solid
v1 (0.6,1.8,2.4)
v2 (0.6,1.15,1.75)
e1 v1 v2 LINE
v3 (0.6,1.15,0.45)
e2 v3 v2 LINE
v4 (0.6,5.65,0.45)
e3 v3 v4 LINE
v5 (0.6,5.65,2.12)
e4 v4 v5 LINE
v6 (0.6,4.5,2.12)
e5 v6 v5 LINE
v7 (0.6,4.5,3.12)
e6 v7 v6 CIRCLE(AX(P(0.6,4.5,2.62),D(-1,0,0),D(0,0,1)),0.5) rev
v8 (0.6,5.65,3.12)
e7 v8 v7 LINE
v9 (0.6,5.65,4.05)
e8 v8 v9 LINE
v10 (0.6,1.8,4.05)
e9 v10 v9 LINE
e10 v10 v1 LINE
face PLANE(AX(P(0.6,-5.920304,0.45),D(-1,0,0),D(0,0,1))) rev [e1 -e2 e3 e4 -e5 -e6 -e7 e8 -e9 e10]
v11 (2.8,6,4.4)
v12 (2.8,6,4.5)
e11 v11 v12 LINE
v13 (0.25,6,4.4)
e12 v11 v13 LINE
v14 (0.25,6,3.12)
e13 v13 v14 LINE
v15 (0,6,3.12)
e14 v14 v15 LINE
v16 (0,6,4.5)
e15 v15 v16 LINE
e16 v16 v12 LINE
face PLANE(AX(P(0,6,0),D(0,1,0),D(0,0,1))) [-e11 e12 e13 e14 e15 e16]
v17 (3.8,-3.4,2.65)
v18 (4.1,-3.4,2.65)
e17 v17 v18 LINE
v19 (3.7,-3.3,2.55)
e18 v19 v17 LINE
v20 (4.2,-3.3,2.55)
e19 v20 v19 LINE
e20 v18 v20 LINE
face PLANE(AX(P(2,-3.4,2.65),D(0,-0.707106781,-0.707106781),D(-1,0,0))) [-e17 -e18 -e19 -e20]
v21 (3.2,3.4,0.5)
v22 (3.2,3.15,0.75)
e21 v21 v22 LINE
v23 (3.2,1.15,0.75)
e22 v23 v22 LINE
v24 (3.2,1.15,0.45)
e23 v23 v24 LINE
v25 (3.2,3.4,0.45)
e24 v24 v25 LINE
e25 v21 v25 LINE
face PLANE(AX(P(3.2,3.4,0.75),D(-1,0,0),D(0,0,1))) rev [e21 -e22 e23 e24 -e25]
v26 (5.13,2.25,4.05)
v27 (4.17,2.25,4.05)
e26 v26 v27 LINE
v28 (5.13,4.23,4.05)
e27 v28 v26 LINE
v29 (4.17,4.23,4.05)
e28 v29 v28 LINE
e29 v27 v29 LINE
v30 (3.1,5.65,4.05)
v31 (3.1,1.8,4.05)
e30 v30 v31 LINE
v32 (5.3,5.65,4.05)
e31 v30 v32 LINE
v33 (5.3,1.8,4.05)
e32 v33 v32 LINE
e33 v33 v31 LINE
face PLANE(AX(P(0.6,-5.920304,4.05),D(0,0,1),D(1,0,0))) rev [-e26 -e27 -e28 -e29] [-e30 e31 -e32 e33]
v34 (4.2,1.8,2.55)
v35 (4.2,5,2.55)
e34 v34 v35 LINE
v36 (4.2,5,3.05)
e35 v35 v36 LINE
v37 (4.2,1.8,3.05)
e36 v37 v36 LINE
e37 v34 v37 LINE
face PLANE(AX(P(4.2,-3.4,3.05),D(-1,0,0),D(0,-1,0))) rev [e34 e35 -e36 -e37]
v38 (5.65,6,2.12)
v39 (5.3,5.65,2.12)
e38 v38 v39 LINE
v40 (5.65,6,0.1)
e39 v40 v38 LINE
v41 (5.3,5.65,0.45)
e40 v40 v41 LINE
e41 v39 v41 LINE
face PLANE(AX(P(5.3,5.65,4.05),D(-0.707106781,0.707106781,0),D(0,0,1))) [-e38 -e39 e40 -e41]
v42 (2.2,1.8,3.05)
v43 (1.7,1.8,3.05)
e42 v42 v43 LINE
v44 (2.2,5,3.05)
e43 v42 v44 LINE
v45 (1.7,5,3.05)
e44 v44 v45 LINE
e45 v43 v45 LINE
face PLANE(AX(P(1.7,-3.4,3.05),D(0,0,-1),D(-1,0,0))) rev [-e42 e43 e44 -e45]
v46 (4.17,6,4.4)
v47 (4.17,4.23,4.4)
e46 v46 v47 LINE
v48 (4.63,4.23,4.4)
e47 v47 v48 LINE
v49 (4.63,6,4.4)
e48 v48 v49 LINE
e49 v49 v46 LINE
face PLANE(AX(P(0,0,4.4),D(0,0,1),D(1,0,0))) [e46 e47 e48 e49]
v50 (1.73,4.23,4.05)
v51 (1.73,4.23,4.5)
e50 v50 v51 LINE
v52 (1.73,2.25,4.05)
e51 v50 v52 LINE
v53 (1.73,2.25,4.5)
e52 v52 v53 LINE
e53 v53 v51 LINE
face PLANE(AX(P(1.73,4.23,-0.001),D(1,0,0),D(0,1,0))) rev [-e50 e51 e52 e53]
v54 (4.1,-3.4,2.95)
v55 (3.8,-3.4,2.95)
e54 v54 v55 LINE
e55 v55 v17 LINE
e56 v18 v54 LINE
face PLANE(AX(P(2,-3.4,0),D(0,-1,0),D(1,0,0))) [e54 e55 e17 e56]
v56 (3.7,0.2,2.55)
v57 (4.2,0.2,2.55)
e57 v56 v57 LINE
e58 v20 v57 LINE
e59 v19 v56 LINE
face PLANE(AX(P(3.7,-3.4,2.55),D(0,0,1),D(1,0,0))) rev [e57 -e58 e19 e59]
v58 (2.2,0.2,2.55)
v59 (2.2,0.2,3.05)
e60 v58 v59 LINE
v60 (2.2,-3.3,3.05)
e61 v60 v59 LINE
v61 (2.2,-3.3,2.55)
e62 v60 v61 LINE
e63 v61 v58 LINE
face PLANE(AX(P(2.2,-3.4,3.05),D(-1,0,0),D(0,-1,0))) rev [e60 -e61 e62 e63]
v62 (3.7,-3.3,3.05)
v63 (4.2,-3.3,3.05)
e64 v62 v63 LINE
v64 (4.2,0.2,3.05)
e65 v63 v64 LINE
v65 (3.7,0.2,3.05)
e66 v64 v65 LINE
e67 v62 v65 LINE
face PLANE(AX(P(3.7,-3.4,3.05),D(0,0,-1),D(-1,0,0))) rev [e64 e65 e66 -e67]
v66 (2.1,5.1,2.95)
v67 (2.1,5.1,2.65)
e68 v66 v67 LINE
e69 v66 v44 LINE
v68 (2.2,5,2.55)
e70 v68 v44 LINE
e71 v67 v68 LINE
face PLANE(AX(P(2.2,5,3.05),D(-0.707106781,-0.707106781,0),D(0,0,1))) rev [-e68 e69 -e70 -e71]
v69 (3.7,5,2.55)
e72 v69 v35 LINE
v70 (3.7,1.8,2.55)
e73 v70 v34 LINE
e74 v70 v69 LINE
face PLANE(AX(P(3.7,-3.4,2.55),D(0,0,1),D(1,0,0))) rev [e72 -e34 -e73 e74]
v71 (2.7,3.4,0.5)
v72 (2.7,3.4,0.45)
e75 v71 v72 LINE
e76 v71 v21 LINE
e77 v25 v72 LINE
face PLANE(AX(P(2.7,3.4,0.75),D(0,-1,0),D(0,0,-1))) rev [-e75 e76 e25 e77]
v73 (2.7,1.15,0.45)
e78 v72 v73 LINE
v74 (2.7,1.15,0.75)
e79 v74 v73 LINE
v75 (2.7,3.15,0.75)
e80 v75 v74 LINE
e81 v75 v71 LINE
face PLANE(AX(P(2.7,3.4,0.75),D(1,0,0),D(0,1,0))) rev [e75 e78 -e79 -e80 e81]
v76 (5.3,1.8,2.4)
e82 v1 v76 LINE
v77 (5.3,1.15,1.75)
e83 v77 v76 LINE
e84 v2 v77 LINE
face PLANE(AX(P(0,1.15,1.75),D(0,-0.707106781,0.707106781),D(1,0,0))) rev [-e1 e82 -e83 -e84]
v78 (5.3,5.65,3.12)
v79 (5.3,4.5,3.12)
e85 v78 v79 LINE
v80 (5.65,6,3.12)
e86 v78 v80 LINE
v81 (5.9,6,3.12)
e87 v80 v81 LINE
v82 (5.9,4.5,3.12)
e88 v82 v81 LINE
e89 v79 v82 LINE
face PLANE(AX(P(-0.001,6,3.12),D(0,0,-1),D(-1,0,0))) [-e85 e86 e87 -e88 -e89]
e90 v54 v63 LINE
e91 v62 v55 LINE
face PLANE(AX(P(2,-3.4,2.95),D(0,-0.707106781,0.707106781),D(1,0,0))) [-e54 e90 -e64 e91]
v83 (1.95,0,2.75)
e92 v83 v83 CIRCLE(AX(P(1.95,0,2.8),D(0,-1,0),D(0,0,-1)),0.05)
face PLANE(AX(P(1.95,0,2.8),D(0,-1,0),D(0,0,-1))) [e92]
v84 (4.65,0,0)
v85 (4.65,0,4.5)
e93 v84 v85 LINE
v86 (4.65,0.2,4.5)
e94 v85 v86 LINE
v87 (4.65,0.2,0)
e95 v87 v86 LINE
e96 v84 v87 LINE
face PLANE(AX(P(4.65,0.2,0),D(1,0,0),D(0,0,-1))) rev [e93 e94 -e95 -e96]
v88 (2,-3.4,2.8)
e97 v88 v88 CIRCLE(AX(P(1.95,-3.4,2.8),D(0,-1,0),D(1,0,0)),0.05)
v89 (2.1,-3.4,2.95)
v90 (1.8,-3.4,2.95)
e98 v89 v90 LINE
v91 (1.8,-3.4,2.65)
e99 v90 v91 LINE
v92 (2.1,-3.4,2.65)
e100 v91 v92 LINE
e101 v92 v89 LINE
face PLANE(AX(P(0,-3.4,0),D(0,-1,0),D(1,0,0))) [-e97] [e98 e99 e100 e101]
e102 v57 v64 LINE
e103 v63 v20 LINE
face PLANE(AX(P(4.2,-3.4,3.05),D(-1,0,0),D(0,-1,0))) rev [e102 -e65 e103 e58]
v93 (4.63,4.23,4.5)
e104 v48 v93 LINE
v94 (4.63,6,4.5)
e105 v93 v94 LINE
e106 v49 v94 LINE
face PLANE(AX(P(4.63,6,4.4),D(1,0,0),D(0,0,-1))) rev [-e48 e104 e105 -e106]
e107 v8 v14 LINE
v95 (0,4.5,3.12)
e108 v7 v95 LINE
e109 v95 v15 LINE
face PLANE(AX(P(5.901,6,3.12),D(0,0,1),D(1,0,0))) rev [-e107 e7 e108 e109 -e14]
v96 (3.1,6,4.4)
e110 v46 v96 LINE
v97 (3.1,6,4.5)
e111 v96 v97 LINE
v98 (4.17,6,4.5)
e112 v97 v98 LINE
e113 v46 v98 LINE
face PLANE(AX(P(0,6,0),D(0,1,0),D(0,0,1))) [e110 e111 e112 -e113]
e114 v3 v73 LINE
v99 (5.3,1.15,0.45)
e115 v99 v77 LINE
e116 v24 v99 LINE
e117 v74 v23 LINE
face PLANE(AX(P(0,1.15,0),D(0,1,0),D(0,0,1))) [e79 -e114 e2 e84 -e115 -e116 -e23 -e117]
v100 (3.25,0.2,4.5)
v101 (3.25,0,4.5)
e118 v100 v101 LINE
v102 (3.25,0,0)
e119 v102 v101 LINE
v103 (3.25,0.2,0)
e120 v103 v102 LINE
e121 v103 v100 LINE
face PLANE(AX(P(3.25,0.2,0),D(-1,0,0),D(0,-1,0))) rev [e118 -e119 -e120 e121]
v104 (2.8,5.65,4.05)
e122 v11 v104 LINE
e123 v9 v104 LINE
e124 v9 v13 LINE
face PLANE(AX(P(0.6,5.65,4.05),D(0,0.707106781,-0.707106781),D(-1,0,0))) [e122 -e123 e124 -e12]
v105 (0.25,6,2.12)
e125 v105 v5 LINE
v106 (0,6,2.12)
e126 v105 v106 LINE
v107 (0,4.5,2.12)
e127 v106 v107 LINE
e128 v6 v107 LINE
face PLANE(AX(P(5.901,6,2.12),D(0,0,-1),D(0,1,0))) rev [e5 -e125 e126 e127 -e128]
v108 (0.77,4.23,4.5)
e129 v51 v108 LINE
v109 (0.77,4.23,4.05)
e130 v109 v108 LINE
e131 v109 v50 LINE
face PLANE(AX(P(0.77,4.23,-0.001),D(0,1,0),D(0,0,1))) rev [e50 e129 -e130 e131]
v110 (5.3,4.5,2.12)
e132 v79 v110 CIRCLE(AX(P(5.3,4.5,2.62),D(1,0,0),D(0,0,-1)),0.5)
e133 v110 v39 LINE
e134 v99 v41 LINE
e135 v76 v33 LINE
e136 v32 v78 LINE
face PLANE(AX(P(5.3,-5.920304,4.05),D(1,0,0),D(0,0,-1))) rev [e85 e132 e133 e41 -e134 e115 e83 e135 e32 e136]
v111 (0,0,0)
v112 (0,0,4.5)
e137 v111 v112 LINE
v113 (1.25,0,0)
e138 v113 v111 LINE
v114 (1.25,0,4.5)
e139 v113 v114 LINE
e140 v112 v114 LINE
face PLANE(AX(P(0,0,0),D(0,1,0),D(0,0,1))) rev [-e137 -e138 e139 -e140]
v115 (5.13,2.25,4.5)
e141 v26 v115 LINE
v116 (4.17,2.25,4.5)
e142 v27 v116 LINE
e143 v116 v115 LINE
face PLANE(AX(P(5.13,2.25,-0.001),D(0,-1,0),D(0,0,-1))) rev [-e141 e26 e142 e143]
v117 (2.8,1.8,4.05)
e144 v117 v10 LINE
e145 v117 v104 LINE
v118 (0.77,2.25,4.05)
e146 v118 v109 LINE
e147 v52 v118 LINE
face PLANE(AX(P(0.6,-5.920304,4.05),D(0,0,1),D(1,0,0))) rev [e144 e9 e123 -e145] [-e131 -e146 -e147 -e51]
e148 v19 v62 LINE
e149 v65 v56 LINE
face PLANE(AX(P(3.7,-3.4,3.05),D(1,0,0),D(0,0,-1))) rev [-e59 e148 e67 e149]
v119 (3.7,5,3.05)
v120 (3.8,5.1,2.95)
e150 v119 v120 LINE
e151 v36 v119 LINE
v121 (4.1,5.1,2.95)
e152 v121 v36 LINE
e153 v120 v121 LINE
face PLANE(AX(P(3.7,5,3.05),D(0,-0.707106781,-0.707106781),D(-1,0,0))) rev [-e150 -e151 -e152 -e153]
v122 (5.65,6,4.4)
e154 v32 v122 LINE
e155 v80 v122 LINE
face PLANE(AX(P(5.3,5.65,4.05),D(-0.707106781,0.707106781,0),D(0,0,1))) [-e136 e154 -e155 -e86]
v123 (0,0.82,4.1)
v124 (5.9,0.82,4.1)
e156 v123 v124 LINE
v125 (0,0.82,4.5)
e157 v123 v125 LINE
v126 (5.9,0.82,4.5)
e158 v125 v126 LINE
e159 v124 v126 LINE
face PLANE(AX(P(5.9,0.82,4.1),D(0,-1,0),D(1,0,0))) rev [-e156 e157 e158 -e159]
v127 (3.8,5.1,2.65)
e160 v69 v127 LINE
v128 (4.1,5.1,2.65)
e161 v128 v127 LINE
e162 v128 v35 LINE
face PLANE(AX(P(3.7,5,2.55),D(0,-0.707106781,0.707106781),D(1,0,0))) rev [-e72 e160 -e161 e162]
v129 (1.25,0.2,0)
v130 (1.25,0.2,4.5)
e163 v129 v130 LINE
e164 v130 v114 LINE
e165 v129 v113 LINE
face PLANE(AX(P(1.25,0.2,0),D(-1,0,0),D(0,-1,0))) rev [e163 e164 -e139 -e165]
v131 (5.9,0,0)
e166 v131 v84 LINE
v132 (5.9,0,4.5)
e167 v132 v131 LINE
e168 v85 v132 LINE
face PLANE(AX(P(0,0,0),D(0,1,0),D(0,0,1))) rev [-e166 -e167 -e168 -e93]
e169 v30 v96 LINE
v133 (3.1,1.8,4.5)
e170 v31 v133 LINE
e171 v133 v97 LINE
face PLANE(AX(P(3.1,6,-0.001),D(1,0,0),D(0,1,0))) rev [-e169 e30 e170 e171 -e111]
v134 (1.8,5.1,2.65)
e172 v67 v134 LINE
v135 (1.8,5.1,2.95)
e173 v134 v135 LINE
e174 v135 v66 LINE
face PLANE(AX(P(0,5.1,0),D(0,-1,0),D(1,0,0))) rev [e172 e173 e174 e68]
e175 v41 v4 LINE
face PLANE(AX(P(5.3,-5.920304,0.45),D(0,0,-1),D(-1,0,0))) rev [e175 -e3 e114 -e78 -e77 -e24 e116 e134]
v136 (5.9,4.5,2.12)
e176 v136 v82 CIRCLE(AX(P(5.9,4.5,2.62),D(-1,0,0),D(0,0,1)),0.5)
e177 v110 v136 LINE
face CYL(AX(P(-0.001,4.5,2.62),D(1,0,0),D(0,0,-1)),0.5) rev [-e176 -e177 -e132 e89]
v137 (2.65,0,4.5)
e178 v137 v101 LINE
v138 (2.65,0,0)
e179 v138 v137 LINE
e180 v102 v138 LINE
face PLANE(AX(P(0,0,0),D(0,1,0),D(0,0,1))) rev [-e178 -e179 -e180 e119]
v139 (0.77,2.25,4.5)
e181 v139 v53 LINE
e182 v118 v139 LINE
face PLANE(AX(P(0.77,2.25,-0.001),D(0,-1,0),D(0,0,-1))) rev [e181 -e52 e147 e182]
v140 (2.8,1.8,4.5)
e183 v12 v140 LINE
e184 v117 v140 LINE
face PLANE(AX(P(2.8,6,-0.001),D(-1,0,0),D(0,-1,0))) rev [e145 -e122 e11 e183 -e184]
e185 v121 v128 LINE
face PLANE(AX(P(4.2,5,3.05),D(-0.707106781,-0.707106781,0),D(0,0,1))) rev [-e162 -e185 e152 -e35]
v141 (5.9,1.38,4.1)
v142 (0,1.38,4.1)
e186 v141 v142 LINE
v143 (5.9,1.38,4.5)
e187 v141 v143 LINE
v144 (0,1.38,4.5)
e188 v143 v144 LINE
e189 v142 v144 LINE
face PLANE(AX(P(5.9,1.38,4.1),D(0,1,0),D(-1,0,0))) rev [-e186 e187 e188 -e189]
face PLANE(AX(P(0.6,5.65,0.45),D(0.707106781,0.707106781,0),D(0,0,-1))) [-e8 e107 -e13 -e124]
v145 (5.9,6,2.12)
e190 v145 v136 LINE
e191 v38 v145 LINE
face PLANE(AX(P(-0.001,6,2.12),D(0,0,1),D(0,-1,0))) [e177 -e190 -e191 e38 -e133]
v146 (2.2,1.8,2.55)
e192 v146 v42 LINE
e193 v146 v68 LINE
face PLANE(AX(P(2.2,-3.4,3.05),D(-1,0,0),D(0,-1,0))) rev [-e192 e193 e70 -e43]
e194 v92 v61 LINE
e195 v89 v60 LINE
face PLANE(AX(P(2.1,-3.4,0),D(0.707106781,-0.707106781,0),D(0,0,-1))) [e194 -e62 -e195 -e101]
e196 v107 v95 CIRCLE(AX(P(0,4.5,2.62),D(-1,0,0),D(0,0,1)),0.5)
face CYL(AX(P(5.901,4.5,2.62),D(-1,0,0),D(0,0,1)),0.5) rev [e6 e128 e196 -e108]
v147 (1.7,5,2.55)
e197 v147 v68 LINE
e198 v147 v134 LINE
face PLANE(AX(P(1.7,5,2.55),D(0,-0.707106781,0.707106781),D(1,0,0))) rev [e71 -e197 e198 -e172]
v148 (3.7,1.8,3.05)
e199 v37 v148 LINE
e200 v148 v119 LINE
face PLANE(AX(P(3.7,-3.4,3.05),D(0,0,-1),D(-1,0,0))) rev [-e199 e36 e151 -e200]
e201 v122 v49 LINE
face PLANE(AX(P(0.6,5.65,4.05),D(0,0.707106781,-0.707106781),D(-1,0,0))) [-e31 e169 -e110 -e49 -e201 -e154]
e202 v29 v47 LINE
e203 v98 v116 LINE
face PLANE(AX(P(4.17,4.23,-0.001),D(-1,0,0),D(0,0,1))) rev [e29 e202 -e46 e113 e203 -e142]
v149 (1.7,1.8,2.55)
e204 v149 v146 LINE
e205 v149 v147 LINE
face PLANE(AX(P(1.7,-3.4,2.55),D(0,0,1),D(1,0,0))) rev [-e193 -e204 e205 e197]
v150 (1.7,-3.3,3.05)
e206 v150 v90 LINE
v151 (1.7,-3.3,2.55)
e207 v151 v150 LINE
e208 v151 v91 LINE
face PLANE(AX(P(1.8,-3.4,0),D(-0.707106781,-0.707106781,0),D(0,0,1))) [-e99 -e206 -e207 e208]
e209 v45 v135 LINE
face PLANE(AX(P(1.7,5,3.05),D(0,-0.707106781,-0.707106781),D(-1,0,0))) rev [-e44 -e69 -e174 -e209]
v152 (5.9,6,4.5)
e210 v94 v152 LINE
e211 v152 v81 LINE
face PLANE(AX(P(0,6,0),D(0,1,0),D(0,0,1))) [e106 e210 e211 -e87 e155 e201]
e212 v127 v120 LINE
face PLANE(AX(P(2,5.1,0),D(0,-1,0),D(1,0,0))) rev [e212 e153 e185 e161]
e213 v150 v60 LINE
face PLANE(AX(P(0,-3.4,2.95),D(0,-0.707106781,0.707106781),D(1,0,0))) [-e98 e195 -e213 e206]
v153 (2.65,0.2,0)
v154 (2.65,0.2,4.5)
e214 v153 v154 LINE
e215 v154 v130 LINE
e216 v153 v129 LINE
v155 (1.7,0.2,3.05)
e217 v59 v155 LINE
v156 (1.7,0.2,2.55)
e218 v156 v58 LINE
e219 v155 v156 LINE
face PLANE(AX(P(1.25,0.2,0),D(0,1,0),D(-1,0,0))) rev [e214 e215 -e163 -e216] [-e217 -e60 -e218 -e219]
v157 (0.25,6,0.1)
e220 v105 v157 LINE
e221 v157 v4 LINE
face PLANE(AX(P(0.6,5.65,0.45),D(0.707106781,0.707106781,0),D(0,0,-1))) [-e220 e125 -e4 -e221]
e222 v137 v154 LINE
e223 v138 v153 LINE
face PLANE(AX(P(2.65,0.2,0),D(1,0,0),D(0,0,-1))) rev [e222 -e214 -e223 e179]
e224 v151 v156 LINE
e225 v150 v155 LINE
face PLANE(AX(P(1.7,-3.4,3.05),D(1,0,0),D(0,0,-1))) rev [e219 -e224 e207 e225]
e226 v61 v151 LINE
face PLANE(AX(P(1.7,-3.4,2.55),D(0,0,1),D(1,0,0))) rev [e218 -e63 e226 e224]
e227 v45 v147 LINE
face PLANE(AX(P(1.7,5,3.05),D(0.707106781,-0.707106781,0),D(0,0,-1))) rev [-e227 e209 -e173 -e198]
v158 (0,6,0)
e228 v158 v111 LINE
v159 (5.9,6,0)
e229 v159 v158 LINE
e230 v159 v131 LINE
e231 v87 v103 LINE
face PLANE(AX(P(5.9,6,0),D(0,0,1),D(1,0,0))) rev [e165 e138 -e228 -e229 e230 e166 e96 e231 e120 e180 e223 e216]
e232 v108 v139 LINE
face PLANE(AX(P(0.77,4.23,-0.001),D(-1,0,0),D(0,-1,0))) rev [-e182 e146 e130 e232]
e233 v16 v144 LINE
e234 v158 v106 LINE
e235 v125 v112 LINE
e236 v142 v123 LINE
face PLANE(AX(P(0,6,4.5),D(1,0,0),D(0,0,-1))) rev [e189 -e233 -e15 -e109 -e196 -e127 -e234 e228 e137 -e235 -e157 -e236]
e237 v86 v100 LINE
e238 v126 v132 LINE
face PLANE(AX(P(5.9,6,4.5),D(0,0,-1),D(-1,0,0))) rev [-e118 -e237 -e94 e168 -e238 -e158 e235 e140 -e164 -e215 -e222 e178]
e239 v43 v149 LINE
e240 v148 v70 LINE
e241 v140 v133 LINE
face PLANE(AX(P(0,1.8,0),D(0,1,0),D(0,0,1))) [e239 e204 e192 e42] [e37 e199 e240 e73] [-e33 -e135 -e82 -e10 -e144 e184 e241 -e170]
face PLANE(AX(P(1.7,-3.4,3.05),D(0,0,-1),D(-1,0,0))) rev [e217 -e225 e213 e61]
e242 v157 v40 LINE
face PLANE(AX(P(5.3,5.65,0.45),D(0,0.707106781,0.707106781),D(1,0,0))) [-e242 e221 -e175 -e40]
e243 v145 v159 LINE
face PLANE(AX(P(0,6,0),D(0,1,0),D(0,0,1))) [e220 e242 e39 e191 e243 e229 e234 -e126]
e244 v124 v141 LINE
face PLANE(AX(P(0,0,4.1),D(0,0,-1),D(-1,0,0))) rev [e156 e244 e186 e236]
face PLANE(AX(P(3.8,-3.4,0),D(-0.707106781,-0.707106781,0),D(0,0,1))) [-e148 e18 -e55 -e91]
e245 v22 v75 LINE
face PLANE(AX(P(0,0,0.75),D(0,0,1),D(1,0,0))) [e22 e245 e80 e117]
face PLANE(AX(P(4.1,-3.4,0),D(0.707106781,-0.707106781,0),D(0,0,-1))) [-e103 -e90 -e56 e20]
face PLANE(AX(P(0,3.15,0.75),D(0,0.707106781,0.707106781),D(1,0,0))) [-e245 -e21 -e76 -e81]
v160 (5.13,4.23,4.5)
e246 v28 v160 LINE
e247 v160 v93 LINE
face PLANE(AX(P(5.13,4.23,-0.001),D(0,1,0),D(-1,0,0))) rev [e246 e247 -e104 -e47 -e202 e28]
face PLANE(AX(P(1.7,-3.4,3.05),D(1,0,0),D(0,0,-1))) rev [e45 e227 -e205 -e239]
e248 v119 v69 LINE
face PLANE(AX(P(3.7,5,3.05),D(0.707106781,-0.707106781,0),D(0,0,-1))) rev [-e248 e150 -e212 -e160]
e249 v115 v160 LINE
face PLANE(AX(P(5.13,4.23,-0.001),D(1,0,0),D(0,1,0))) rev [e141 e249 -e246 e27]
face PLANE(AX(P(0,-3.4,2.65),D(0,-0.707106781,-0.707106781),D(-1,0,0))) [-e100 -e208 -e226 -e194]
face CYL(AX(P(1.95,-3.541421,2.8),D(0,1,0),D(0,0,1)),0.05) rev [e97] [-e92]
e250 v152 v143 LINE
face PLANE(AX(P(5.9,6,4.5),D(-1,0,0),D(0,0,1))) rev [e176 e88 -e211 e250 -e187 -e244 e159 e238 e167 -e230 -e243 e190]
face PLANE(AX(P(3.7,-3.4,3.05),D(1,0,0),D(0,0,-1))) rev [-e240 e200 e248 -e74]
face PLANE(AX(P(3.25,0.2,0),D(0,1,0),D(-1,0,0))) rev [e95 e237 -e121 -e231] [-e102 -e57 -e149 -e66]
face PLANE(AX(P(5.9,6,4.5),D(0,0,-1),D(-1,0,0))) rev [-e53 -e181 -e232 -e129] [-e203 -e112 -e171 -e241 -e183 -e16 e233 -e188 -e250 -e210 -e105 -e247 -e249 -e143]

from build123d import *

# Parameters (mm, degrees)
BODY1_W                            = 5.9
BODY1_H                            = 4.5
EXTRUDE_1_DEPTH                    = 6
SKETCH_2_W                         = 4.7
SKETCH_2_H                         = 3.6
CUT_EXTRUDE_1_DEPTH                = 4.2
SKETCH_3_W                         = 5.9
SKETCH_3_H                         = 0.56
CUT_EXTRUDE_2_DEPTH                = 0.4
CHAMFER_1_SIZE                     = 0.35
CUT_EXTRUDE_3_REACH                = 11.543
SKETCH_4_W                         = 0.96
SKETCH_4_H                         = 1.98
SKETCH_5_W                         = 1.4
SKETCH_5_H                         = 0.2
CUT_EXTRUDE_4_DEPTH                = 10.54253635
SKETCH_7_W                         = 0.46
SKETCH_7_H                         = 1.77
CUT_EXTRUDE_5_DEPTH                = 0.1
CUT_EXTRUDE_6_REACH                = 11.543
SKETCH_8_W                         = 0.3
SKETCH_8_H                         = 4.2
CUT_EXTRUDE_7_REACH                = 11.543
SKETCH_15_W                        = 4.7
SKETCH_15_H                        = 1.95
CUT_EXTRUDE_9_DEPTH                = 0.65
CHAMFER_7_SIZE                     = 0.65
SKETCH_10_W                        = 0.5
SKETCH_10_H                        = 2.25
EXTRUDE_2_DEPTH                    = 0.3
CHAMFER_2_SIZE                     = 0.25
EXTRUDE_START                      = -4.9
SKETCH_12_W                        = 0.5
SKETCH_12_H                        = 0.5
EXTRUDE_4_DEPTH                    = 8.5
CHAMFER_3_SIZE                     = 0.1
CHAMFER_4_SIZE                     = 0.1
PATTERN_LINEAR_2_COUNT             = 2
PATTERN_LINEAR_2_PITCH             = 2
CHAMFER_3_OF_PATTERN_LINEAR_2_SIZE = 0.1
CHAMFER_4_OF_PATTERN_LINEAR_2_SIZE = 0.1
SKETCH_16_R                        = 0.05
CUT_EXTRUDE_10_DEPTH               = 3.4


with BuildPart() as part:
    # Body1 → Бобышка-Вытянуть1 (new body)
    with BuildSketch(Plane(origin=(0, 0, 0), x_dir=(1, 0, 0), z_dir=(0, 1, 0))):
        with Locations((2.95, -2.25)):
            Rectangle(BODY1_W, BODY1_H)
    extrude(amount=EXTRUDE_1_DEPTH)

    # Эскиз2 → Вырез-Вытянуть1 (cut)
    with BuildSketch(Plane(origin=(0, 6, 0), x_dir=(1, 0, 0), z_dir=(0, 1, 0))):
        with Locations((2.95, -2.25)):
            Rectangle(SKETCH_2_W, SKETCH_2_H)
    extrude(amount=-CUT_EXTRUDE_1_DEPTH, mode=Mode.SUBTRACT)

    # Эскиз3 → Вырез-Вытянуть2 (cut)
    with BuildSketch(Plane.XY.offset(4.5)):
        with Locations((2.95, 1.1)):
            Rectangle(SKETCH_3_W, SKETCH_3_H)
    extrude(amount=-CUT_EXTRUDE_2_DEPTH, mode=Mode.SUBTRACT)

    # Фаска1
    chamfer_1_edges = [part.edges().sort_by_distance(p)[0] for p in [
        (2.95, 6, 4.05),
        (5.3, 6, 2.25),
        (2.95, 6, 0.45),
        (0.6, 6, 2.25),
    ]]
    chamfer(chamfer_1_edges, length=CHAMFER_1_SIZE)

    # Эскиз4 → Вырез-Вытянуть3 (cut, up to next)
    with BuildSketch(Plane.XY.offset(4.5), mode=Mode.PRIVATE) as cut_extrude_3_sk1:
        with Locations((1.25, 3.24)):
            Rectangle(SKETCH_4_W, SKETCH_4_H)
    cut_extrude_3_tool1 = extrude(cut_extrude_3_sk1.sketch, amount=-CUT_EXTRUDE_3_REACH, mode=Mode.PRIVATE) & part.part
    # Эскиз4 → Вырез-Вытянуть3 (cut, up to next)
    with BuildSketch(Plane.XY.offset(4.5), mode=Mode.PRIVATE) as cut_extrude_3_sk2:
        with Locations((4.65, 3.24)):
            Rectangle(SKETCH_4_W, SKETCH_4_H)
    cut_extrude_3_tool2 = extrude(cut_extrude_3_sk2.sketch, amount=-CUT_EXTRUDE_3_REACH, mode=Mode.PRIVATE) & part.part
    add(cut_extrude_3_tool1.solids().sort_by_distance((1.25, 3.24, 4.5))[0], mode=Mode.SUBTRACT)
    add(cut_extrude_3_tool2.solids().sort_by_distance((4.65, 3.24, 4.5))[0], mode=Mode.SUBTRACT)

    # Эскиз5 → Вырез-Вытянуть4 (cut, through all)
    with BuildSketch(Plane.XY.offset(4.5)):
        with Locations((1.95, 0.1)):
            Rectangle(SKETCH_5_W, SKETCH_5_H)
    cut_extrude_4 = extrude(amount=-CUT_EXTRUDE_4_DEPTH, mode=Mode.SUBTRACT)

    # Эскиз7 → Вырез-Вытянуть5 (cut)
    with BuildSketch(Plane.XY.offset(4.5)):
        with Locations((4.4, 5.115)):
            Rectangle(SKETCH_7_W, SKETCH_7_H)
    extrude(amount=-CUT_EXTRUDE_5_DEPTH, mode=Mode.SUBTRACT)

    # Эскиз8 → Вырез-Вытянуть6 (cut, up to next)
    with BuildSketch(Plane.XY.offset(4.5), mode=Mode.PRIVATE) as cut_extrude_6_sk1:
        with Locations((2.95, 3.9)):
            Rectangle(SKETCH_8_W, SKETCH_8_H)
    cut_extrude_6_tool1 = extrude(cut_extrude_6_sk1.sketch, amount=-CUT_EXTRUDE_6_REACH, mode=Mode.PRIVATE) & part.part
    add(cut_extrude_6_tool1.solids().sort_by_distance((2.95, 3.9, 4.5))[0], mode=Mode.SUBTRACT)

    # Эскиз9 → Вырез-Вытянуть7 (cut, up to next)
    with BuildSketch(Plane.ZY, mode=Mode.PRIVATE) as cut_extrude_7_sk1:
        with BuildLine():
            Line((2.12, 6), (3.12, 6))
            Line((3.12, 6), (3.12, 4.5))
            ThreePointArc((3.12, 4.5), (2.62, 4), (2.12, 4.5))
            Line((2.12, 4.5), (2.12, 6))
        make_face()
    cut_extrude_7_tool1 = extrude(cut_extrude_7_sk1.sketch, amount=-CUT_EXTRUDE_7_REACH, mode=Mode.PRIVATE) & part.part
    cut_extrude_7 = cut_extrude_7_tool1.solids().sort_by_distance((0, 5.05036, 2.62))[0]
    add(cut_extrude_7, mode=Mode.SUBTRACT)

    # Зеркальное отражение1: Вырез-Вытянуть7 across plane
    add(cut_extrude_7.mirror(Plane(origin=(2.95, 0, 0), x_dir=(0, 0, 1), z_dir=(1, 0, 0))), mode=Mode.SUBTRACT)

    # Эскиз15 → Вырез-Вытянуть9 (cut)
    with BuildSketch(Plane(origin=(0, 1.8, 0), x_dir=(1, 0, 0), z_dir=(0, 1, 0))):
        with Locations((2.95, -1.425)):
            Rectangle(SKETCH_15_W, SKETCH_15_H)
    extrude(amount=-CUT_EXTRUDE_9_DEPTH, mode=Mode.SUBTRACT)

    # Фаска7
    chamfer_7_edges = [part.edges().sort_by_distance(p)[0] for p in [
        (2.95, 1.15, 2.4),
    ]]
    chamfer(chamfer_7_edges, length=CHAMFER_7_SIZE - 0.0001)  # a hair under: the kernel refuses the full size

    # Эскиз10 → Бобышка-Вытянуть2 (add)
    with BuildSketch(Plane.XY.offset(0.45)):
        with Locations((2.95, 2.275)):
            Rectangle(SKETCH_10_W, SKETCH_10_H)
    extrude(amount=EXTRUDE_2_DEPTH)

    # Фаска2
    chamfer_2_edges = [part.edges().sort_by_distance(p)[0] for p in [
        (2.95, 3.4, 0.75),
    ]]
    chamfer(chamfer_2_edges, length=CHAMFER_2_SIZE)

    # Эскиз12 → Бобышка-Вытянуть4 (add)
    with BuildSketch(Plane.XZ.offset(-0.2).offset(EXTRUDE_START)):
        with Locations((1.95, 2.8)):
            Rectangle(SKETCH_12_W, SKETCH_12_H)
    extrude_4 = extrude(amount=EXTRUDE_4_DEPTH)

    # Фаска3
    chamfer_3_edges = [part.edges().sort_by_distance(p)[0] for p in [
        (1.7, -3.4, 2.8),
        (1.95, -3.4, 2.55),
        (2.2, -3.4, 2.8),
        (1.95, -3.4, 3.05),
    ]]
    chamfer(chamfer_3_edges, length=CHAMFER_3_SIZE)

    # Фаска4
    chamfer_4_edges = [part.edges().sort_by_distance(p)[0] for p in [
        (1.7, 5.1, 2.8),
        (1.95, 5.1, 2.55),
        (2.2, 5.1, 2.8),
        (1.95, 5.1, 3.05),
    ]]
    chamfer(chamfer_4_edges, length=CHAMFER_4_SIZE)

    # Линейный массив2: Вырез-Вытянуть4, Бобышка-Вытянуть4 ×2
    with Locations(*[(i * PATTERN_LINEAR_2_PITCH, 0, 0) for i in range(1, PATTERN_LINEAR_2_COUNT)]):
        add(cut_extrude_4, mode=Mode.SUBTRACT)
        add(extrude_4)

    # Фаска3 of Линейный массив2
    chamfer_3_of_pattern_linear_2_edges = [part.edges().sort_by_distance(p)[0] for p in [
        (3.7, -3.4, 2.8),
        (3.95, -3.4, 2.55),
        (4.2, -3.4, 2.8),
        (3.95, -3.4, 3.05),
    ]]
    chamfer(chamfer_3_of_pattern_linear_2_edges, length=CHAMFER_3_OF_PATTERN_LINEAR_2_SIZE)

    # Фаска4 of Линейный массив2
    chamfer_4_of_pattern_linear_2_edges = [part.edges().sort_by_distance(p)[0] for p in [
        (3.7, 5.1, 2.8),
        (3.95, 5.1, 2.55),
        (4.2, 5.1, 2.8),
        (3.95, 5.1, 3.05),
    ]]
    chamfer(chamfer_4_of_pattern_linear_2_edges, length=CHAMFER_4_OF_PATTERN_LINEAR_2_SIZE)

    # Эскиз16 → Вырез-Вытянуть10 (cut)
    with BuildSketch(Plane.XZ):
        with Locations((1.95, 2.8)):
            Circle(SKETCH_16_R)
    extrude(amount=CUT_EXTRUDE_10_DEPTH, mode=Mode.SUBTRACT)


solid = part.part
